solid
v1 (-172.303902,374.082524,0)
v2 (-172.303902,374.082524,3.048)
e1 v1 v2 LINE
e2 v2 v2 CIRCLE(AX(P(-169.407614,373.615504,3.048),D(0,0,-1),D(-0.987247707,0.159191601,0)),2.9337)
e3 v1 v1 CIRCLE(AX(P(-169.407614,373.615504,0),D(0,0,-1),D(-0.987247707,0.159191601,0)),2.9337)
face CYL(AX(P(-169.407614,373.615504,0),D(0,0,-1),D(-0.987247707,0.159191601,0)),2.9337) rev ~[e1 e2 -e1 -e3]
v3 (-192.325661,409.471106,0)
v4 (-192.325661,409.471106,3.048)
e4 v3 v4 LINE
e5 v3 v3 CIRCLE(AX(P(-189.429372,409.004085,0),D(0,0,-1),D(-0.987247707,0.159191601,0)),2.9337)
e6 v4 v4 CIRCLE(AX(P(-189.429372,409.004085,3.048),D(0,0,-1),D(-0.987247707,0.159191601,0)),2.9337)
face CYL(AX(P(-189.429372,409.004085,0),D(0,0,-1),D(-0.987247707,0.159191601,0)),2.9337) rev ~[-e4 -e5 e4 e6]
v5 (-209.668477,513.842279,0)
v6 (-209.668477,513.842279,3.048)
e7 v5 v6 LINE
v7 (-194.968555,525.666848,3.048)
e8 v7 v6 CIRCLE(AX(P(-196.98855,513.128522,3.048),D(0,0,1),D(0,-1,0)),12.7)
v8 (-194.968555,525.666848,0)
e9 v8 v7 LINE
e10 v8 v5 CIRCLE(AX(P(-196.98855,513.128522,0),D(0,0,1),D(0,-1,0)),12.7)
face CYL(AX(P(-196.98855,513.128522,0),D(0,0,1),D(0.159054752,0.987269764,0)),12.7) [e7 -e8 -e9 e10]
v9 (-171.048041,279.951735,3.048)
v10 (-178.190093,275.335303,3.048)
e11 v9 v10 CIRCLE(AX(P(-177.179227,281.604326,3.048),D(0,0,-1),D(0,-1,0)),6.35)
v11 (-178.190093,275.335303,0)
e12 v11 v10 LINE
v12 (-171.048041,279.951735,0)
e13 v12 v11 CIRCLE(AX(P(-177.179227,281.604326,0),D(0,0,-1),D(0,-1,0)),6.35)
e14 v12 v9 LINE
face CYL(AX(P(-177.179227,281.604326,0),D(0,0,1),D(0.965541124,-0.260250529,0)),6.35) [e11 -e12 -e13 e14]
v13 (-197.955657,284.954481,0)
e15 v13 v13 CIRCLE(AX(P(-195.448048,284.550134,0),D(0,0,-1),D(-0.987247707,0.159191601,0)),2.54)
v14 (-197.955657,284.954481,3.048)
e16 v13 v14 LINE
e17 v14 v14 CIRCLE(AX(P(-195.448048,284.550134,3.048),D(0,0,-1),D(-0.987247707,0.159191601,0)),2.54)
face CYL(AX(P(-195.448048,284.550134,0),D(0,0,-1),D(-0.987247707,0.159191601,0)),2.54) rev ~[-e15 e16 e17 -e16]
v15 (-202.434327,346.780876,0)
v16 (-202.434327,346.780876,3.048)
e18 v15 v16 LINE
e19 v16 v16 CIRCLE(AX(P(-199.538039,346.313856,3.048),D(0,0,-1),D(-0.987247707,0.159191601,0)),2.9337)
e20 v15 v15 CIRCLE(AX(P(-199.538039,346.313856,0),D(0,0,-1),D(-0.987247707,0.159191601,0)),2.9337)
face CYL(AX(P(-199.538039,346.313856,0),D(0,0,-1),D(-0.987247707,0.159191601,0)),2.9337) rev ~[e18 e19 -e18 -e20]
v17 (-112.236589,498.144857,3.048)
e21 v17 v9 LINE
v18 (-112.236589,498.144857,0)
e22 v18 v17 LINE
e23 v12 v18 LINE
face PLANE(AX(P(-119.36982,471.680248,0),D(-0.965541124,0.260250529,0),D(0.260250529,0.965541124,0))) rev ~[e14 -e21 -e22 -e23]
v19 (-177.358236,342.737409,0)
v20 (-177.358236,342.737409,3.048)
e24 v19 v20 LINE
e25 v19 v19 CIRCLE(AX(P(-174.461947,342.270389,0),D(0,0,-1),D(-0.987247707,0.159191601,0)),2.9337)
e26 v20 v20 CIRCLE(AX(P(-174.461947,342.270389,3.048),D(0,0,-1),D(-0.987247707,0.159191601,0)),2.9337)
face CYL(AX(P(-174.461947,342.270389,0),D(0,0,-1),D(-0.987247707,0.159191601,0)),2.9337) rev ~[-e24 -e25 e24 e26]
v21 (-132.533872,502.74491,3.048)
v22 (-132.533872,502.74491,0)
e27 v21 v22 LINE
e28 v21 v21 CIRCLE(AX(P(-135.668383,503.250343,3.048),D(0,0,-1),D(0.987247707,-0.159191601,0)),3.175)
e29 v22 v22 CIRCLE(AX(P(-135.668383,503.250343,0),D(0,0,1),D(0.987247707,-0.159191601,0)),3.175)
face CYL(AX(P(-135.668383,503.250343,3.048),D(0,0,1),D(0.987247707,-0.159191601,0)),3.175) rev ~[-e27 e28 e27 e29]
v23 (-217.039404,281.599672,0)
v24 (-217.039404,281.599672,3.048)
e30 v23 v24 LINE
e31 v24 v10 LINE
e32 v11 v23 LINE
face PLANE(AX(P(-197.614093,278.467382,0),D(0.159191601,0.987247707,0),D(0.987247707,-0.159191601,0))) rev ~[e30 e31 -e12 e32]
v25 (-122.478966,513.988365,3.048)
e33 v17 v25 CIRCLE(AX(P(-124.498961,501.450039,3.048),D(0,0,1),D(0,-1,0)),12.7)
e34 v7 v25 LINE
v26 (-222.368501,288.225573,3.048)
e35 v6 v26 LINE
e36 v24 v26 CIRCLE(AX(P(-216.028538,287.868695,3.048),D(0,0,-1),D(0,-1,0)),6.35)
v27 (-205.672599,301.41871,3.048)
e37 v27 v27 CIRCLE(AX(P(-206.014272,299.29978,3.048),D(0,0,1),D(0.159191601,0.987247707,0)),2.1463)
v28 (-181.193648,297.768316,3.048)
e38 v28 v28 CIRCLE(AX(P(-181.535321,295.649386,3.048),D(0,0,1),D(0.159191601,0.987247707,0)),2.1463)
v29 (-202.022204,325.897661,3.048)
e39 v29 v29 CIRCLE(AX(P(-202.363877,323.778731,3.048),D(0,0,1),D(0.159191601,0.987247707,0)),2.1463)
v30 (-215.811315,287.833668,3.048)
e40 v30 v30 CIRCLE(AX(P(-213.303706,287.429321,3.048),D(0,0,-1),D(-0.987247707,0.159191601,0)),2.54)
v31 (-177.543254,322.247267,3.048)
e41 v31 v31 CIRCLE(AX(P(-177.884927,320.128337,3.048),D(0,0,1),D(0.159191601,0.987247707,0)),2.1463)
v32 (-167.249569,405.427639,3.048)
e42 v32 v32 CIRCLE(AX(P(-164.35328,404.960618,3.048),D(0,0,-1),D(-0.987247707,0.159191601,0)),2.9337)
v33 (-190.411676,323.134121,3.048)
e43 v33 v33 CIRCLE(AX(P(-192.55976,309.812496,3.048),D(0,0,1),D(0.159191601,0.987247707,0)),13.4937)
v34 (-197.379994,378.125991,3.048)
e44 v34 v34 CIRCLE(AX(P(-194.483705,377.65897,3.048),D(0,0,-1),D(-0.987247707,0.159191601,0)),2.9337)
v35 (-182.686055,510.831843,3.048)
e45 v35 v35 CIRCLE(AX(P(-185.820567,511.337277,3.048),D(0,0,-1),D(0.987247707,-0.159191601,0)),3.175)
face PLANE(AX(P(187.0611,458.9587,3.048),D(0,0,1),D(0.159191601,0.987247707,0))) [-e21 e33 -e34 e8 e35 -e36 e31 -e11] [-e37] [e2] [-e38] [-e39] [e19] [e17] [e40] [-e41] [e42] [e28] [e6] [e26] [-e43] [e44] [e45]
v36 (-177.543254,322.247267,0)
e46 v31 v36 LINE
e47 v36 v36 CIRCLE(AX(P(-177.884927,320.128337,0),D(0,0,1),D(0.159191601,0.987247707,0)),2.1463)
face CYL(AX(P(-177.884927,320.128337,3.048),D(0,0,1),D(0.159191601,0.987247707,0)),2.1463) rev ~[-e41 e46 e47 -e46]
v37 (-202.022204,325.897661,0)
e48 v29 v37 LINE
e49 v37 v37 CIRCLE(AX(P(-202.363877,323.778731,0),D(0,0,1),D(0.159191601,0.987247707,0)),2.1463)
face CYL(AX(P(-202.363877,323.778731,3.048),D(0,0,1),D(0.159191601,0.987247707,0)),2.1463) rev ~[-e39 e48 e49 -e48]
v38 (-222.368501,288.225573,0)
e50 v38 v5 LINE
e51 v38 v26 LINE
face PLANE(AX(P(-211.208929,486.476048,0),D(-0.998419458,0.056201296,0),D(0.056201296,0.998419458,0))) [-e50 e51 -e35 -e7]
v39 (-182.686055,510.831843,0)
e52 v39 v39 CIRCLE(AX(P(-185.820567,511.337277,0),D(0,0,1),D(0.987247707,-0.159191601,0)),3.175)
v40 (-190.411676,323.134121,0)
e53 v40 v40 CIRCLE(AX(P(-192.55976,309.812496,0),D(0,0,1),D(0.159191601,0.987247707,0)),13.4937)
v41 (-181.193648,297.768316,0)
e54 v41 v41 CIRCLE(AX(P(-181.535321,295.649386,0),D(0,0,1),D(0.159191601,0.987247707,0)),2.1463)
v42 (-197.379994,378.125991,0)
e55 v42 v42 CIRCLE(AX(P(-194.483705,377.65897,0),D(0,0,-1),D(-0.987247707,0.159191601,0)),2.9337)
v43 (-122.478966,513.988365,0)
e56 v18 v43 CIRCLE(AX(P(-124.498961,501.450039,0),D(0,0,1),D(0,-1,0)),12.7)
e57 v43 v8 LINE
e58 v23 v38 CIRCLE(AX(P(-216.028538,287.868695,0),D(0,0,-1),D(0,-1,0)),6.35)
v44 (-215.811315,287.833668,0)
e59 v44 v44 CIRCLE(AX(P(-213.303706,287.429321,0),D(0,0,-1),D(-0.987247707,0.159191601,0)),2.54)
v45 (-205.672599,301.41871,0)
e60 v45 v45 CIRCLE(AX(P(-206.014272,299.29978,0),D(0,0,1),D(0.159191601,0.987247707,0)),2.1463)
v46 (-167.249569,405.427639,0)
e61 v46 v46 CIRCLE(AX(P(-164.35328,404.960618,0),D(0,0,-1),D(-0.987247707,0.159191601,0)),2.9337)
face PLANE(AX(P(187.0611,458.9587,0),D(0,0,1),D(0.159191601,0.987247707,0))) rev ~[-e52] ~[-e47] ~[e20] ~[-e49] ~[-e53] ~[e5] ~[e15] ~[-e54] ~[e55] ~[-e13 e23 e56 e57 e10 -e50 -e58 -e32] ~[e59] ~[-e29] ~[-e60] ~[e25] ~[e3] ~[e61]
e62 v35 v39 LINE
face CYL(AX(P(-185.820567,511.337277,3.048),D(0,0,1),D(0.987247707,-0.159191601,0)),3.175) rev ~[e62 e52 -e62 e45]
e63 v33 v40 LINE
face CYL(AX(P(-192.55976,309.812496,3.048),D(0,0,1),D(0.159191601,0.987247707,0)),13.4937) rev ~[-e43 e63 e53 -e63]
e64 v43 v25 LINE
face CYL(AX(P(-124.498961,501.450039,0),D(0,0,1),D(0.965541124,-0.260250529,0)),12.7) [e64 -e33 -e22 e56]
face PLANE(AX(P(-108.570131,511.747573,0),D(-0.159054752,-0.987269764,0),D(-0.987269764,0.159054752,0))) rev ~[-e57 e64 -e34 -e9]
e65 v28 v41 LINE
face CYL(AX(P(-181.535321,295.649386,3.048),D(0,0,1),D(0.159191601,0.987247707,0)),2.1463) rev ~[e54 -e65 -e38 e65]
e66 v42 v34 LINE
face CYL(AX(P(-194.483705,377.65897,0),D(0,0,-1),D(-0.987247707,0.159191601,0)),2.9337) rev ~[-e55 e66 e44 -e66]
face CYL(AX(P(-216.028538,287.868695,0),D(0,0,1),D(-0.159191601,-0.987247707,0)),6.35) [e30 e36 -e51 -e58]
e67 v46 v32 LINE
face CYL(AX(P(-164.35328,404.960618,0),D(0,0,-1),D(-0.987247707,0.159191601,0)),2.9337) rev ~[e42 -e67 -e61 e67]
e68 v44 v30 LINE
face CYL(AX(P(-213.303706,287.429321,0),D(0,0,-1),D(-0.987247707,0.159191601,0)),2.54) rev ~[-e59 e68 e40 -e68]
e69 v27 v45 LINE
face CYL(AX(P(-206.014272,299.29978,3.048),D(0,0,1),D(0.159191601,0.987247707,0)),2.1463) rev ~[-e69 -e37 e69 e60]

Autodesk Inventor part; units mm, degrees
ref_plane "YZ Plane" through (0, 0, 0) normal (1, 0, 0) x (0, 1, 0)
ref_plane "XZ Plane" through (0, 0, 0) normal (0, 1, 0) x (-1, 0, 0)
ref_plane "Work Plane1" through (187.0611, 458.9587, 0) normal (0, 0, 1) x (0.1591916, 0.9872477, 0)
sketch "Sketch1" plane through (187.0611, 458.9587, 0) normal (0, 0, 1) x (0.1591916, 0.9872477, 0)
  line L0 (5.0953, 0.0423) -> (5.0108, 609.6423) projected
  line L1 (-36.1797, 0.0366) -> (-36.2642, 609.6366) projected
  line L2 (-87.0268, 299.6189) -> (-40.0368, 299.6189) projected
  line L3 (5.0667, 206.0736) -> (-239.4228, 300.8893)
  line L4 (-87.0268, 401.2189) -> (-239.4268, 401.2189) projected
  line L5 (5.0265, 496.0682) -> (-239.4268, 401.2189)
  circle A0 centre (-207.6768, 350.4189) radius 15.4305 construction
  circle A1 centre (-207.6768, 350.4189) radius 13.0556 construction
  circle A2 centre (-207.6767, 351.037) radius 12.7
  line L6 (5.0466, 351.0648) -> (-194.9767, 351.037)
  line L7 (-220.3767, 351.037) -> (-239.4267, 351.037)
  line L8 (-239.4267, 351.037) -> (-239.4267, 325.637)
  line L9 (-239.4267, 351.037) -> (-239.4267, 376.437)
  line L10 (-239.4267, 325.637) -> (5.0537, 300.2648)
  line L11 (-239.4267, 376.437) -> (5.0396, 401.8648)
  point P0 (-482.8845, 111.6133)
  point P1 (5.0526, 307.6736)
  point P2 (5.0406, 394.4682)
  point P3 (5.0304, 467.7016)
  point P4 (5.0628, 234.4154)
  point P5 (-239.4268, 372.8507)
  dimension "d0" = 101.6
  dimension "d1" = 101.6
  dimension "d2" = 233.2861
  dimension "d30" = 244.4764
  dimension "d35" = 25.4
  dimension "d38" = 25.4
  dimension "d39" = 25.4
  dimension "d40" = 200.0234
  dimension "d41" = 50.8
  dimension "d42" = 50.8
  dimension "d43" = 19.05
  dimension "d44" = 25.4277
  dimension "d45" = 25.3723
extrude "Plate1" add sketch "Sketch1" along normal blind 3.048 contours L10 L1 L6 L0 | L6 L1 L11 L0 | L10 L8 L7 A2 L6 L1 | L6 A2 L7 L9 L11 L1
sketch "Sketch2" plane through (187.0611, 458.9587, 3.048) normal (0, 0, 1) x (0.1591916, 0.9872477, 0)
  circle A0 centre (-195.4493, 362.9394) radius 2.1463 projected
  circle A1 centre (-220.1972, 362.6464) radius 2.1463 projected
  circle A2 centre (-219.9042, 337.8985) radius 2.1463 projected
  circle A3 centre (-195.1563, 338.1915) radius 2.1463 projected
  point P0 (-482.8845, 111.6133)
extrude "Extrusion1" cut sketch "Sketch2" against normal up to surface (3.048 mm away)
sketch "Sketch3" plane through (187.0611, 458.9587, 3.048) normal (0, 0, 1) x (0.1591916, 0.9872477, 0)
  circle A0 centre (-207.6767, 351.037) radius 12.7 projected
  circle A1 centre (-207.6767, 351.037) radius 13.4937
  point P0 (-482.8845, 111.6133)
  point P1 (-207.6768, 350.4189)
  dimension "d36" = 0.7937
extrude "Extrusion2" cut sketch "Sketch3" against normal up to surface (3.048 mm away)
sketch "Sketch5" plane through (187.0611, 458.9587, 3.048) normal (0, 0, 1) x (0.9872477, -0.1591916, 0)
  line L0 (-401.8648, 5.0396) -> (-300.2648, 5.0537) projected
  line L1 (-300.2648, 5.0537) -> (-401.8648, 5.0396) construction
  line L2 (-319.3169, 5.051) -> (-319.3151, -7.649) construction
  line L3 (-401.8648, 5.0396) -> (-376.437, -239.4267) projected
  line L4 (-319.3151, -7.649) -> (-301.583, -7.649)
  line L5 (-300.2648, 5.0537) -> (-325.637, -239.4267) projected
  circle A0 centre (-376.4648, -7.649) radius 3.175
  circle A1 centre (-325.6648, -7.649) radius 3.175
  line L6 (-319.3151, -7.649) -> (-322.4898, -7.649)
  line L7 (-328.8398, -7.649) -> (-373.2898, -7.649)
  line L8 (-379.6398, -7.649) -> (-400.545, -7.649)
  point P0 (-111.6133, -482.8845)
  point P1 (-351.0648, 5.0466)
  dimension "d47" = 12.7
  dimension "d48" = 12.7025
  dimension "d49" = 6.35
  dimension "d50" = 6.35
  dimension "d51" = 50.8
  dimension "d52" = 50.8
  dimension "d53" = 25.4
sketch "Sketch6" plane through (187.0611, 458.9587, 0) normal (0, 0, -1) x (-0.9872477, 0.1591916, 0)
  circle A0 centre (337.8985, -219.9042) radius 2.1463
  circle A1 centre (338.1915, -195.1563) radius 2.1463
  circle A2 centre (362.6464, -220.1972) radius 2.1463
  circle A3 centre (362.9394, -195.4493) radius 2.1463
  line L0 (325.637, -239.4267) -> (376.437, -239.4267)
  line L1 (300.2648, 5.0537) -> (325.637, -239.4267)
  line L2 (376.437, -239.4267) -> (401.8648, 5.0396)
  line L3 (401.8648, 5.0396) -> (300.2648, 5.0537)
  circle A4 centre (338.337, -172.7517) radius 2.9337
  circle A5 centre (338.337, -141.0017) radius 2.9337
  circle A6 centre (363.737, -141.0017) radius 2.9337
  circle A7 centre (363.737, -172.7517) radius 2.9337
  circle A8 centre (338.337, -109.2517) radius 2.9337
  circle A9 centre (363.737, -109.2517) radius 2.9337
  point P0 (111.6133, -482.8845)
extrude "Extrusion5" cut sketch "Sketch6" against normal up to next contours A4 | A5 | A6 | A7 | A8 | A9
sketch "Sketch7" plane through (187.0611, 458.9587, 0) normal (0, 0, -1) x (-0.9872477, 0.1591916, 0)
  circle A0 centre (367.9532, -233.0767) radius 2.54 projected
  circle A1 centre (349.8669, -233.0767) radius 2.54 projected
  point P0 (111.6133, -482.8845)
extrude "Extrusion6" cut sketch "Sketch7" against normal up to next
extrude "Extrusion7" cut sketch "Sketch5" against normal up to next contours A0 | A1
fillet "Fillet1" radius 12.7 2 edges at (-108.57, 511.7476, 1.524) (-208.8766, 527.9075, 1.524)
fillet "Fillet2" radius 6.35 2 edges at (-222.6902, 282.5108, 1.524) (-172.538, 274.4239, 1.524)
equation "\"BendRadius\" = Thickness"
equation "\"BendReliefWidth\" = Thickness"
equation "\"BendReliefDepth\" = 0.5 * Thickness"
equation "\"CornerReliefSize\" = 4 * Thickness"
equation "\"MinimumRemnant\" = 2 * Thickness"
equation "\"TransitionRadius\" = BendRadius"
equation "\"JacobiRadiusSize\" = BendRadius"
equation "\"GapSize\" = Thickness"
equation "\"d4\" = BendRadius"
equation "\"Thickness\" = 3.048"
properties part number "lifterMountMetal"
